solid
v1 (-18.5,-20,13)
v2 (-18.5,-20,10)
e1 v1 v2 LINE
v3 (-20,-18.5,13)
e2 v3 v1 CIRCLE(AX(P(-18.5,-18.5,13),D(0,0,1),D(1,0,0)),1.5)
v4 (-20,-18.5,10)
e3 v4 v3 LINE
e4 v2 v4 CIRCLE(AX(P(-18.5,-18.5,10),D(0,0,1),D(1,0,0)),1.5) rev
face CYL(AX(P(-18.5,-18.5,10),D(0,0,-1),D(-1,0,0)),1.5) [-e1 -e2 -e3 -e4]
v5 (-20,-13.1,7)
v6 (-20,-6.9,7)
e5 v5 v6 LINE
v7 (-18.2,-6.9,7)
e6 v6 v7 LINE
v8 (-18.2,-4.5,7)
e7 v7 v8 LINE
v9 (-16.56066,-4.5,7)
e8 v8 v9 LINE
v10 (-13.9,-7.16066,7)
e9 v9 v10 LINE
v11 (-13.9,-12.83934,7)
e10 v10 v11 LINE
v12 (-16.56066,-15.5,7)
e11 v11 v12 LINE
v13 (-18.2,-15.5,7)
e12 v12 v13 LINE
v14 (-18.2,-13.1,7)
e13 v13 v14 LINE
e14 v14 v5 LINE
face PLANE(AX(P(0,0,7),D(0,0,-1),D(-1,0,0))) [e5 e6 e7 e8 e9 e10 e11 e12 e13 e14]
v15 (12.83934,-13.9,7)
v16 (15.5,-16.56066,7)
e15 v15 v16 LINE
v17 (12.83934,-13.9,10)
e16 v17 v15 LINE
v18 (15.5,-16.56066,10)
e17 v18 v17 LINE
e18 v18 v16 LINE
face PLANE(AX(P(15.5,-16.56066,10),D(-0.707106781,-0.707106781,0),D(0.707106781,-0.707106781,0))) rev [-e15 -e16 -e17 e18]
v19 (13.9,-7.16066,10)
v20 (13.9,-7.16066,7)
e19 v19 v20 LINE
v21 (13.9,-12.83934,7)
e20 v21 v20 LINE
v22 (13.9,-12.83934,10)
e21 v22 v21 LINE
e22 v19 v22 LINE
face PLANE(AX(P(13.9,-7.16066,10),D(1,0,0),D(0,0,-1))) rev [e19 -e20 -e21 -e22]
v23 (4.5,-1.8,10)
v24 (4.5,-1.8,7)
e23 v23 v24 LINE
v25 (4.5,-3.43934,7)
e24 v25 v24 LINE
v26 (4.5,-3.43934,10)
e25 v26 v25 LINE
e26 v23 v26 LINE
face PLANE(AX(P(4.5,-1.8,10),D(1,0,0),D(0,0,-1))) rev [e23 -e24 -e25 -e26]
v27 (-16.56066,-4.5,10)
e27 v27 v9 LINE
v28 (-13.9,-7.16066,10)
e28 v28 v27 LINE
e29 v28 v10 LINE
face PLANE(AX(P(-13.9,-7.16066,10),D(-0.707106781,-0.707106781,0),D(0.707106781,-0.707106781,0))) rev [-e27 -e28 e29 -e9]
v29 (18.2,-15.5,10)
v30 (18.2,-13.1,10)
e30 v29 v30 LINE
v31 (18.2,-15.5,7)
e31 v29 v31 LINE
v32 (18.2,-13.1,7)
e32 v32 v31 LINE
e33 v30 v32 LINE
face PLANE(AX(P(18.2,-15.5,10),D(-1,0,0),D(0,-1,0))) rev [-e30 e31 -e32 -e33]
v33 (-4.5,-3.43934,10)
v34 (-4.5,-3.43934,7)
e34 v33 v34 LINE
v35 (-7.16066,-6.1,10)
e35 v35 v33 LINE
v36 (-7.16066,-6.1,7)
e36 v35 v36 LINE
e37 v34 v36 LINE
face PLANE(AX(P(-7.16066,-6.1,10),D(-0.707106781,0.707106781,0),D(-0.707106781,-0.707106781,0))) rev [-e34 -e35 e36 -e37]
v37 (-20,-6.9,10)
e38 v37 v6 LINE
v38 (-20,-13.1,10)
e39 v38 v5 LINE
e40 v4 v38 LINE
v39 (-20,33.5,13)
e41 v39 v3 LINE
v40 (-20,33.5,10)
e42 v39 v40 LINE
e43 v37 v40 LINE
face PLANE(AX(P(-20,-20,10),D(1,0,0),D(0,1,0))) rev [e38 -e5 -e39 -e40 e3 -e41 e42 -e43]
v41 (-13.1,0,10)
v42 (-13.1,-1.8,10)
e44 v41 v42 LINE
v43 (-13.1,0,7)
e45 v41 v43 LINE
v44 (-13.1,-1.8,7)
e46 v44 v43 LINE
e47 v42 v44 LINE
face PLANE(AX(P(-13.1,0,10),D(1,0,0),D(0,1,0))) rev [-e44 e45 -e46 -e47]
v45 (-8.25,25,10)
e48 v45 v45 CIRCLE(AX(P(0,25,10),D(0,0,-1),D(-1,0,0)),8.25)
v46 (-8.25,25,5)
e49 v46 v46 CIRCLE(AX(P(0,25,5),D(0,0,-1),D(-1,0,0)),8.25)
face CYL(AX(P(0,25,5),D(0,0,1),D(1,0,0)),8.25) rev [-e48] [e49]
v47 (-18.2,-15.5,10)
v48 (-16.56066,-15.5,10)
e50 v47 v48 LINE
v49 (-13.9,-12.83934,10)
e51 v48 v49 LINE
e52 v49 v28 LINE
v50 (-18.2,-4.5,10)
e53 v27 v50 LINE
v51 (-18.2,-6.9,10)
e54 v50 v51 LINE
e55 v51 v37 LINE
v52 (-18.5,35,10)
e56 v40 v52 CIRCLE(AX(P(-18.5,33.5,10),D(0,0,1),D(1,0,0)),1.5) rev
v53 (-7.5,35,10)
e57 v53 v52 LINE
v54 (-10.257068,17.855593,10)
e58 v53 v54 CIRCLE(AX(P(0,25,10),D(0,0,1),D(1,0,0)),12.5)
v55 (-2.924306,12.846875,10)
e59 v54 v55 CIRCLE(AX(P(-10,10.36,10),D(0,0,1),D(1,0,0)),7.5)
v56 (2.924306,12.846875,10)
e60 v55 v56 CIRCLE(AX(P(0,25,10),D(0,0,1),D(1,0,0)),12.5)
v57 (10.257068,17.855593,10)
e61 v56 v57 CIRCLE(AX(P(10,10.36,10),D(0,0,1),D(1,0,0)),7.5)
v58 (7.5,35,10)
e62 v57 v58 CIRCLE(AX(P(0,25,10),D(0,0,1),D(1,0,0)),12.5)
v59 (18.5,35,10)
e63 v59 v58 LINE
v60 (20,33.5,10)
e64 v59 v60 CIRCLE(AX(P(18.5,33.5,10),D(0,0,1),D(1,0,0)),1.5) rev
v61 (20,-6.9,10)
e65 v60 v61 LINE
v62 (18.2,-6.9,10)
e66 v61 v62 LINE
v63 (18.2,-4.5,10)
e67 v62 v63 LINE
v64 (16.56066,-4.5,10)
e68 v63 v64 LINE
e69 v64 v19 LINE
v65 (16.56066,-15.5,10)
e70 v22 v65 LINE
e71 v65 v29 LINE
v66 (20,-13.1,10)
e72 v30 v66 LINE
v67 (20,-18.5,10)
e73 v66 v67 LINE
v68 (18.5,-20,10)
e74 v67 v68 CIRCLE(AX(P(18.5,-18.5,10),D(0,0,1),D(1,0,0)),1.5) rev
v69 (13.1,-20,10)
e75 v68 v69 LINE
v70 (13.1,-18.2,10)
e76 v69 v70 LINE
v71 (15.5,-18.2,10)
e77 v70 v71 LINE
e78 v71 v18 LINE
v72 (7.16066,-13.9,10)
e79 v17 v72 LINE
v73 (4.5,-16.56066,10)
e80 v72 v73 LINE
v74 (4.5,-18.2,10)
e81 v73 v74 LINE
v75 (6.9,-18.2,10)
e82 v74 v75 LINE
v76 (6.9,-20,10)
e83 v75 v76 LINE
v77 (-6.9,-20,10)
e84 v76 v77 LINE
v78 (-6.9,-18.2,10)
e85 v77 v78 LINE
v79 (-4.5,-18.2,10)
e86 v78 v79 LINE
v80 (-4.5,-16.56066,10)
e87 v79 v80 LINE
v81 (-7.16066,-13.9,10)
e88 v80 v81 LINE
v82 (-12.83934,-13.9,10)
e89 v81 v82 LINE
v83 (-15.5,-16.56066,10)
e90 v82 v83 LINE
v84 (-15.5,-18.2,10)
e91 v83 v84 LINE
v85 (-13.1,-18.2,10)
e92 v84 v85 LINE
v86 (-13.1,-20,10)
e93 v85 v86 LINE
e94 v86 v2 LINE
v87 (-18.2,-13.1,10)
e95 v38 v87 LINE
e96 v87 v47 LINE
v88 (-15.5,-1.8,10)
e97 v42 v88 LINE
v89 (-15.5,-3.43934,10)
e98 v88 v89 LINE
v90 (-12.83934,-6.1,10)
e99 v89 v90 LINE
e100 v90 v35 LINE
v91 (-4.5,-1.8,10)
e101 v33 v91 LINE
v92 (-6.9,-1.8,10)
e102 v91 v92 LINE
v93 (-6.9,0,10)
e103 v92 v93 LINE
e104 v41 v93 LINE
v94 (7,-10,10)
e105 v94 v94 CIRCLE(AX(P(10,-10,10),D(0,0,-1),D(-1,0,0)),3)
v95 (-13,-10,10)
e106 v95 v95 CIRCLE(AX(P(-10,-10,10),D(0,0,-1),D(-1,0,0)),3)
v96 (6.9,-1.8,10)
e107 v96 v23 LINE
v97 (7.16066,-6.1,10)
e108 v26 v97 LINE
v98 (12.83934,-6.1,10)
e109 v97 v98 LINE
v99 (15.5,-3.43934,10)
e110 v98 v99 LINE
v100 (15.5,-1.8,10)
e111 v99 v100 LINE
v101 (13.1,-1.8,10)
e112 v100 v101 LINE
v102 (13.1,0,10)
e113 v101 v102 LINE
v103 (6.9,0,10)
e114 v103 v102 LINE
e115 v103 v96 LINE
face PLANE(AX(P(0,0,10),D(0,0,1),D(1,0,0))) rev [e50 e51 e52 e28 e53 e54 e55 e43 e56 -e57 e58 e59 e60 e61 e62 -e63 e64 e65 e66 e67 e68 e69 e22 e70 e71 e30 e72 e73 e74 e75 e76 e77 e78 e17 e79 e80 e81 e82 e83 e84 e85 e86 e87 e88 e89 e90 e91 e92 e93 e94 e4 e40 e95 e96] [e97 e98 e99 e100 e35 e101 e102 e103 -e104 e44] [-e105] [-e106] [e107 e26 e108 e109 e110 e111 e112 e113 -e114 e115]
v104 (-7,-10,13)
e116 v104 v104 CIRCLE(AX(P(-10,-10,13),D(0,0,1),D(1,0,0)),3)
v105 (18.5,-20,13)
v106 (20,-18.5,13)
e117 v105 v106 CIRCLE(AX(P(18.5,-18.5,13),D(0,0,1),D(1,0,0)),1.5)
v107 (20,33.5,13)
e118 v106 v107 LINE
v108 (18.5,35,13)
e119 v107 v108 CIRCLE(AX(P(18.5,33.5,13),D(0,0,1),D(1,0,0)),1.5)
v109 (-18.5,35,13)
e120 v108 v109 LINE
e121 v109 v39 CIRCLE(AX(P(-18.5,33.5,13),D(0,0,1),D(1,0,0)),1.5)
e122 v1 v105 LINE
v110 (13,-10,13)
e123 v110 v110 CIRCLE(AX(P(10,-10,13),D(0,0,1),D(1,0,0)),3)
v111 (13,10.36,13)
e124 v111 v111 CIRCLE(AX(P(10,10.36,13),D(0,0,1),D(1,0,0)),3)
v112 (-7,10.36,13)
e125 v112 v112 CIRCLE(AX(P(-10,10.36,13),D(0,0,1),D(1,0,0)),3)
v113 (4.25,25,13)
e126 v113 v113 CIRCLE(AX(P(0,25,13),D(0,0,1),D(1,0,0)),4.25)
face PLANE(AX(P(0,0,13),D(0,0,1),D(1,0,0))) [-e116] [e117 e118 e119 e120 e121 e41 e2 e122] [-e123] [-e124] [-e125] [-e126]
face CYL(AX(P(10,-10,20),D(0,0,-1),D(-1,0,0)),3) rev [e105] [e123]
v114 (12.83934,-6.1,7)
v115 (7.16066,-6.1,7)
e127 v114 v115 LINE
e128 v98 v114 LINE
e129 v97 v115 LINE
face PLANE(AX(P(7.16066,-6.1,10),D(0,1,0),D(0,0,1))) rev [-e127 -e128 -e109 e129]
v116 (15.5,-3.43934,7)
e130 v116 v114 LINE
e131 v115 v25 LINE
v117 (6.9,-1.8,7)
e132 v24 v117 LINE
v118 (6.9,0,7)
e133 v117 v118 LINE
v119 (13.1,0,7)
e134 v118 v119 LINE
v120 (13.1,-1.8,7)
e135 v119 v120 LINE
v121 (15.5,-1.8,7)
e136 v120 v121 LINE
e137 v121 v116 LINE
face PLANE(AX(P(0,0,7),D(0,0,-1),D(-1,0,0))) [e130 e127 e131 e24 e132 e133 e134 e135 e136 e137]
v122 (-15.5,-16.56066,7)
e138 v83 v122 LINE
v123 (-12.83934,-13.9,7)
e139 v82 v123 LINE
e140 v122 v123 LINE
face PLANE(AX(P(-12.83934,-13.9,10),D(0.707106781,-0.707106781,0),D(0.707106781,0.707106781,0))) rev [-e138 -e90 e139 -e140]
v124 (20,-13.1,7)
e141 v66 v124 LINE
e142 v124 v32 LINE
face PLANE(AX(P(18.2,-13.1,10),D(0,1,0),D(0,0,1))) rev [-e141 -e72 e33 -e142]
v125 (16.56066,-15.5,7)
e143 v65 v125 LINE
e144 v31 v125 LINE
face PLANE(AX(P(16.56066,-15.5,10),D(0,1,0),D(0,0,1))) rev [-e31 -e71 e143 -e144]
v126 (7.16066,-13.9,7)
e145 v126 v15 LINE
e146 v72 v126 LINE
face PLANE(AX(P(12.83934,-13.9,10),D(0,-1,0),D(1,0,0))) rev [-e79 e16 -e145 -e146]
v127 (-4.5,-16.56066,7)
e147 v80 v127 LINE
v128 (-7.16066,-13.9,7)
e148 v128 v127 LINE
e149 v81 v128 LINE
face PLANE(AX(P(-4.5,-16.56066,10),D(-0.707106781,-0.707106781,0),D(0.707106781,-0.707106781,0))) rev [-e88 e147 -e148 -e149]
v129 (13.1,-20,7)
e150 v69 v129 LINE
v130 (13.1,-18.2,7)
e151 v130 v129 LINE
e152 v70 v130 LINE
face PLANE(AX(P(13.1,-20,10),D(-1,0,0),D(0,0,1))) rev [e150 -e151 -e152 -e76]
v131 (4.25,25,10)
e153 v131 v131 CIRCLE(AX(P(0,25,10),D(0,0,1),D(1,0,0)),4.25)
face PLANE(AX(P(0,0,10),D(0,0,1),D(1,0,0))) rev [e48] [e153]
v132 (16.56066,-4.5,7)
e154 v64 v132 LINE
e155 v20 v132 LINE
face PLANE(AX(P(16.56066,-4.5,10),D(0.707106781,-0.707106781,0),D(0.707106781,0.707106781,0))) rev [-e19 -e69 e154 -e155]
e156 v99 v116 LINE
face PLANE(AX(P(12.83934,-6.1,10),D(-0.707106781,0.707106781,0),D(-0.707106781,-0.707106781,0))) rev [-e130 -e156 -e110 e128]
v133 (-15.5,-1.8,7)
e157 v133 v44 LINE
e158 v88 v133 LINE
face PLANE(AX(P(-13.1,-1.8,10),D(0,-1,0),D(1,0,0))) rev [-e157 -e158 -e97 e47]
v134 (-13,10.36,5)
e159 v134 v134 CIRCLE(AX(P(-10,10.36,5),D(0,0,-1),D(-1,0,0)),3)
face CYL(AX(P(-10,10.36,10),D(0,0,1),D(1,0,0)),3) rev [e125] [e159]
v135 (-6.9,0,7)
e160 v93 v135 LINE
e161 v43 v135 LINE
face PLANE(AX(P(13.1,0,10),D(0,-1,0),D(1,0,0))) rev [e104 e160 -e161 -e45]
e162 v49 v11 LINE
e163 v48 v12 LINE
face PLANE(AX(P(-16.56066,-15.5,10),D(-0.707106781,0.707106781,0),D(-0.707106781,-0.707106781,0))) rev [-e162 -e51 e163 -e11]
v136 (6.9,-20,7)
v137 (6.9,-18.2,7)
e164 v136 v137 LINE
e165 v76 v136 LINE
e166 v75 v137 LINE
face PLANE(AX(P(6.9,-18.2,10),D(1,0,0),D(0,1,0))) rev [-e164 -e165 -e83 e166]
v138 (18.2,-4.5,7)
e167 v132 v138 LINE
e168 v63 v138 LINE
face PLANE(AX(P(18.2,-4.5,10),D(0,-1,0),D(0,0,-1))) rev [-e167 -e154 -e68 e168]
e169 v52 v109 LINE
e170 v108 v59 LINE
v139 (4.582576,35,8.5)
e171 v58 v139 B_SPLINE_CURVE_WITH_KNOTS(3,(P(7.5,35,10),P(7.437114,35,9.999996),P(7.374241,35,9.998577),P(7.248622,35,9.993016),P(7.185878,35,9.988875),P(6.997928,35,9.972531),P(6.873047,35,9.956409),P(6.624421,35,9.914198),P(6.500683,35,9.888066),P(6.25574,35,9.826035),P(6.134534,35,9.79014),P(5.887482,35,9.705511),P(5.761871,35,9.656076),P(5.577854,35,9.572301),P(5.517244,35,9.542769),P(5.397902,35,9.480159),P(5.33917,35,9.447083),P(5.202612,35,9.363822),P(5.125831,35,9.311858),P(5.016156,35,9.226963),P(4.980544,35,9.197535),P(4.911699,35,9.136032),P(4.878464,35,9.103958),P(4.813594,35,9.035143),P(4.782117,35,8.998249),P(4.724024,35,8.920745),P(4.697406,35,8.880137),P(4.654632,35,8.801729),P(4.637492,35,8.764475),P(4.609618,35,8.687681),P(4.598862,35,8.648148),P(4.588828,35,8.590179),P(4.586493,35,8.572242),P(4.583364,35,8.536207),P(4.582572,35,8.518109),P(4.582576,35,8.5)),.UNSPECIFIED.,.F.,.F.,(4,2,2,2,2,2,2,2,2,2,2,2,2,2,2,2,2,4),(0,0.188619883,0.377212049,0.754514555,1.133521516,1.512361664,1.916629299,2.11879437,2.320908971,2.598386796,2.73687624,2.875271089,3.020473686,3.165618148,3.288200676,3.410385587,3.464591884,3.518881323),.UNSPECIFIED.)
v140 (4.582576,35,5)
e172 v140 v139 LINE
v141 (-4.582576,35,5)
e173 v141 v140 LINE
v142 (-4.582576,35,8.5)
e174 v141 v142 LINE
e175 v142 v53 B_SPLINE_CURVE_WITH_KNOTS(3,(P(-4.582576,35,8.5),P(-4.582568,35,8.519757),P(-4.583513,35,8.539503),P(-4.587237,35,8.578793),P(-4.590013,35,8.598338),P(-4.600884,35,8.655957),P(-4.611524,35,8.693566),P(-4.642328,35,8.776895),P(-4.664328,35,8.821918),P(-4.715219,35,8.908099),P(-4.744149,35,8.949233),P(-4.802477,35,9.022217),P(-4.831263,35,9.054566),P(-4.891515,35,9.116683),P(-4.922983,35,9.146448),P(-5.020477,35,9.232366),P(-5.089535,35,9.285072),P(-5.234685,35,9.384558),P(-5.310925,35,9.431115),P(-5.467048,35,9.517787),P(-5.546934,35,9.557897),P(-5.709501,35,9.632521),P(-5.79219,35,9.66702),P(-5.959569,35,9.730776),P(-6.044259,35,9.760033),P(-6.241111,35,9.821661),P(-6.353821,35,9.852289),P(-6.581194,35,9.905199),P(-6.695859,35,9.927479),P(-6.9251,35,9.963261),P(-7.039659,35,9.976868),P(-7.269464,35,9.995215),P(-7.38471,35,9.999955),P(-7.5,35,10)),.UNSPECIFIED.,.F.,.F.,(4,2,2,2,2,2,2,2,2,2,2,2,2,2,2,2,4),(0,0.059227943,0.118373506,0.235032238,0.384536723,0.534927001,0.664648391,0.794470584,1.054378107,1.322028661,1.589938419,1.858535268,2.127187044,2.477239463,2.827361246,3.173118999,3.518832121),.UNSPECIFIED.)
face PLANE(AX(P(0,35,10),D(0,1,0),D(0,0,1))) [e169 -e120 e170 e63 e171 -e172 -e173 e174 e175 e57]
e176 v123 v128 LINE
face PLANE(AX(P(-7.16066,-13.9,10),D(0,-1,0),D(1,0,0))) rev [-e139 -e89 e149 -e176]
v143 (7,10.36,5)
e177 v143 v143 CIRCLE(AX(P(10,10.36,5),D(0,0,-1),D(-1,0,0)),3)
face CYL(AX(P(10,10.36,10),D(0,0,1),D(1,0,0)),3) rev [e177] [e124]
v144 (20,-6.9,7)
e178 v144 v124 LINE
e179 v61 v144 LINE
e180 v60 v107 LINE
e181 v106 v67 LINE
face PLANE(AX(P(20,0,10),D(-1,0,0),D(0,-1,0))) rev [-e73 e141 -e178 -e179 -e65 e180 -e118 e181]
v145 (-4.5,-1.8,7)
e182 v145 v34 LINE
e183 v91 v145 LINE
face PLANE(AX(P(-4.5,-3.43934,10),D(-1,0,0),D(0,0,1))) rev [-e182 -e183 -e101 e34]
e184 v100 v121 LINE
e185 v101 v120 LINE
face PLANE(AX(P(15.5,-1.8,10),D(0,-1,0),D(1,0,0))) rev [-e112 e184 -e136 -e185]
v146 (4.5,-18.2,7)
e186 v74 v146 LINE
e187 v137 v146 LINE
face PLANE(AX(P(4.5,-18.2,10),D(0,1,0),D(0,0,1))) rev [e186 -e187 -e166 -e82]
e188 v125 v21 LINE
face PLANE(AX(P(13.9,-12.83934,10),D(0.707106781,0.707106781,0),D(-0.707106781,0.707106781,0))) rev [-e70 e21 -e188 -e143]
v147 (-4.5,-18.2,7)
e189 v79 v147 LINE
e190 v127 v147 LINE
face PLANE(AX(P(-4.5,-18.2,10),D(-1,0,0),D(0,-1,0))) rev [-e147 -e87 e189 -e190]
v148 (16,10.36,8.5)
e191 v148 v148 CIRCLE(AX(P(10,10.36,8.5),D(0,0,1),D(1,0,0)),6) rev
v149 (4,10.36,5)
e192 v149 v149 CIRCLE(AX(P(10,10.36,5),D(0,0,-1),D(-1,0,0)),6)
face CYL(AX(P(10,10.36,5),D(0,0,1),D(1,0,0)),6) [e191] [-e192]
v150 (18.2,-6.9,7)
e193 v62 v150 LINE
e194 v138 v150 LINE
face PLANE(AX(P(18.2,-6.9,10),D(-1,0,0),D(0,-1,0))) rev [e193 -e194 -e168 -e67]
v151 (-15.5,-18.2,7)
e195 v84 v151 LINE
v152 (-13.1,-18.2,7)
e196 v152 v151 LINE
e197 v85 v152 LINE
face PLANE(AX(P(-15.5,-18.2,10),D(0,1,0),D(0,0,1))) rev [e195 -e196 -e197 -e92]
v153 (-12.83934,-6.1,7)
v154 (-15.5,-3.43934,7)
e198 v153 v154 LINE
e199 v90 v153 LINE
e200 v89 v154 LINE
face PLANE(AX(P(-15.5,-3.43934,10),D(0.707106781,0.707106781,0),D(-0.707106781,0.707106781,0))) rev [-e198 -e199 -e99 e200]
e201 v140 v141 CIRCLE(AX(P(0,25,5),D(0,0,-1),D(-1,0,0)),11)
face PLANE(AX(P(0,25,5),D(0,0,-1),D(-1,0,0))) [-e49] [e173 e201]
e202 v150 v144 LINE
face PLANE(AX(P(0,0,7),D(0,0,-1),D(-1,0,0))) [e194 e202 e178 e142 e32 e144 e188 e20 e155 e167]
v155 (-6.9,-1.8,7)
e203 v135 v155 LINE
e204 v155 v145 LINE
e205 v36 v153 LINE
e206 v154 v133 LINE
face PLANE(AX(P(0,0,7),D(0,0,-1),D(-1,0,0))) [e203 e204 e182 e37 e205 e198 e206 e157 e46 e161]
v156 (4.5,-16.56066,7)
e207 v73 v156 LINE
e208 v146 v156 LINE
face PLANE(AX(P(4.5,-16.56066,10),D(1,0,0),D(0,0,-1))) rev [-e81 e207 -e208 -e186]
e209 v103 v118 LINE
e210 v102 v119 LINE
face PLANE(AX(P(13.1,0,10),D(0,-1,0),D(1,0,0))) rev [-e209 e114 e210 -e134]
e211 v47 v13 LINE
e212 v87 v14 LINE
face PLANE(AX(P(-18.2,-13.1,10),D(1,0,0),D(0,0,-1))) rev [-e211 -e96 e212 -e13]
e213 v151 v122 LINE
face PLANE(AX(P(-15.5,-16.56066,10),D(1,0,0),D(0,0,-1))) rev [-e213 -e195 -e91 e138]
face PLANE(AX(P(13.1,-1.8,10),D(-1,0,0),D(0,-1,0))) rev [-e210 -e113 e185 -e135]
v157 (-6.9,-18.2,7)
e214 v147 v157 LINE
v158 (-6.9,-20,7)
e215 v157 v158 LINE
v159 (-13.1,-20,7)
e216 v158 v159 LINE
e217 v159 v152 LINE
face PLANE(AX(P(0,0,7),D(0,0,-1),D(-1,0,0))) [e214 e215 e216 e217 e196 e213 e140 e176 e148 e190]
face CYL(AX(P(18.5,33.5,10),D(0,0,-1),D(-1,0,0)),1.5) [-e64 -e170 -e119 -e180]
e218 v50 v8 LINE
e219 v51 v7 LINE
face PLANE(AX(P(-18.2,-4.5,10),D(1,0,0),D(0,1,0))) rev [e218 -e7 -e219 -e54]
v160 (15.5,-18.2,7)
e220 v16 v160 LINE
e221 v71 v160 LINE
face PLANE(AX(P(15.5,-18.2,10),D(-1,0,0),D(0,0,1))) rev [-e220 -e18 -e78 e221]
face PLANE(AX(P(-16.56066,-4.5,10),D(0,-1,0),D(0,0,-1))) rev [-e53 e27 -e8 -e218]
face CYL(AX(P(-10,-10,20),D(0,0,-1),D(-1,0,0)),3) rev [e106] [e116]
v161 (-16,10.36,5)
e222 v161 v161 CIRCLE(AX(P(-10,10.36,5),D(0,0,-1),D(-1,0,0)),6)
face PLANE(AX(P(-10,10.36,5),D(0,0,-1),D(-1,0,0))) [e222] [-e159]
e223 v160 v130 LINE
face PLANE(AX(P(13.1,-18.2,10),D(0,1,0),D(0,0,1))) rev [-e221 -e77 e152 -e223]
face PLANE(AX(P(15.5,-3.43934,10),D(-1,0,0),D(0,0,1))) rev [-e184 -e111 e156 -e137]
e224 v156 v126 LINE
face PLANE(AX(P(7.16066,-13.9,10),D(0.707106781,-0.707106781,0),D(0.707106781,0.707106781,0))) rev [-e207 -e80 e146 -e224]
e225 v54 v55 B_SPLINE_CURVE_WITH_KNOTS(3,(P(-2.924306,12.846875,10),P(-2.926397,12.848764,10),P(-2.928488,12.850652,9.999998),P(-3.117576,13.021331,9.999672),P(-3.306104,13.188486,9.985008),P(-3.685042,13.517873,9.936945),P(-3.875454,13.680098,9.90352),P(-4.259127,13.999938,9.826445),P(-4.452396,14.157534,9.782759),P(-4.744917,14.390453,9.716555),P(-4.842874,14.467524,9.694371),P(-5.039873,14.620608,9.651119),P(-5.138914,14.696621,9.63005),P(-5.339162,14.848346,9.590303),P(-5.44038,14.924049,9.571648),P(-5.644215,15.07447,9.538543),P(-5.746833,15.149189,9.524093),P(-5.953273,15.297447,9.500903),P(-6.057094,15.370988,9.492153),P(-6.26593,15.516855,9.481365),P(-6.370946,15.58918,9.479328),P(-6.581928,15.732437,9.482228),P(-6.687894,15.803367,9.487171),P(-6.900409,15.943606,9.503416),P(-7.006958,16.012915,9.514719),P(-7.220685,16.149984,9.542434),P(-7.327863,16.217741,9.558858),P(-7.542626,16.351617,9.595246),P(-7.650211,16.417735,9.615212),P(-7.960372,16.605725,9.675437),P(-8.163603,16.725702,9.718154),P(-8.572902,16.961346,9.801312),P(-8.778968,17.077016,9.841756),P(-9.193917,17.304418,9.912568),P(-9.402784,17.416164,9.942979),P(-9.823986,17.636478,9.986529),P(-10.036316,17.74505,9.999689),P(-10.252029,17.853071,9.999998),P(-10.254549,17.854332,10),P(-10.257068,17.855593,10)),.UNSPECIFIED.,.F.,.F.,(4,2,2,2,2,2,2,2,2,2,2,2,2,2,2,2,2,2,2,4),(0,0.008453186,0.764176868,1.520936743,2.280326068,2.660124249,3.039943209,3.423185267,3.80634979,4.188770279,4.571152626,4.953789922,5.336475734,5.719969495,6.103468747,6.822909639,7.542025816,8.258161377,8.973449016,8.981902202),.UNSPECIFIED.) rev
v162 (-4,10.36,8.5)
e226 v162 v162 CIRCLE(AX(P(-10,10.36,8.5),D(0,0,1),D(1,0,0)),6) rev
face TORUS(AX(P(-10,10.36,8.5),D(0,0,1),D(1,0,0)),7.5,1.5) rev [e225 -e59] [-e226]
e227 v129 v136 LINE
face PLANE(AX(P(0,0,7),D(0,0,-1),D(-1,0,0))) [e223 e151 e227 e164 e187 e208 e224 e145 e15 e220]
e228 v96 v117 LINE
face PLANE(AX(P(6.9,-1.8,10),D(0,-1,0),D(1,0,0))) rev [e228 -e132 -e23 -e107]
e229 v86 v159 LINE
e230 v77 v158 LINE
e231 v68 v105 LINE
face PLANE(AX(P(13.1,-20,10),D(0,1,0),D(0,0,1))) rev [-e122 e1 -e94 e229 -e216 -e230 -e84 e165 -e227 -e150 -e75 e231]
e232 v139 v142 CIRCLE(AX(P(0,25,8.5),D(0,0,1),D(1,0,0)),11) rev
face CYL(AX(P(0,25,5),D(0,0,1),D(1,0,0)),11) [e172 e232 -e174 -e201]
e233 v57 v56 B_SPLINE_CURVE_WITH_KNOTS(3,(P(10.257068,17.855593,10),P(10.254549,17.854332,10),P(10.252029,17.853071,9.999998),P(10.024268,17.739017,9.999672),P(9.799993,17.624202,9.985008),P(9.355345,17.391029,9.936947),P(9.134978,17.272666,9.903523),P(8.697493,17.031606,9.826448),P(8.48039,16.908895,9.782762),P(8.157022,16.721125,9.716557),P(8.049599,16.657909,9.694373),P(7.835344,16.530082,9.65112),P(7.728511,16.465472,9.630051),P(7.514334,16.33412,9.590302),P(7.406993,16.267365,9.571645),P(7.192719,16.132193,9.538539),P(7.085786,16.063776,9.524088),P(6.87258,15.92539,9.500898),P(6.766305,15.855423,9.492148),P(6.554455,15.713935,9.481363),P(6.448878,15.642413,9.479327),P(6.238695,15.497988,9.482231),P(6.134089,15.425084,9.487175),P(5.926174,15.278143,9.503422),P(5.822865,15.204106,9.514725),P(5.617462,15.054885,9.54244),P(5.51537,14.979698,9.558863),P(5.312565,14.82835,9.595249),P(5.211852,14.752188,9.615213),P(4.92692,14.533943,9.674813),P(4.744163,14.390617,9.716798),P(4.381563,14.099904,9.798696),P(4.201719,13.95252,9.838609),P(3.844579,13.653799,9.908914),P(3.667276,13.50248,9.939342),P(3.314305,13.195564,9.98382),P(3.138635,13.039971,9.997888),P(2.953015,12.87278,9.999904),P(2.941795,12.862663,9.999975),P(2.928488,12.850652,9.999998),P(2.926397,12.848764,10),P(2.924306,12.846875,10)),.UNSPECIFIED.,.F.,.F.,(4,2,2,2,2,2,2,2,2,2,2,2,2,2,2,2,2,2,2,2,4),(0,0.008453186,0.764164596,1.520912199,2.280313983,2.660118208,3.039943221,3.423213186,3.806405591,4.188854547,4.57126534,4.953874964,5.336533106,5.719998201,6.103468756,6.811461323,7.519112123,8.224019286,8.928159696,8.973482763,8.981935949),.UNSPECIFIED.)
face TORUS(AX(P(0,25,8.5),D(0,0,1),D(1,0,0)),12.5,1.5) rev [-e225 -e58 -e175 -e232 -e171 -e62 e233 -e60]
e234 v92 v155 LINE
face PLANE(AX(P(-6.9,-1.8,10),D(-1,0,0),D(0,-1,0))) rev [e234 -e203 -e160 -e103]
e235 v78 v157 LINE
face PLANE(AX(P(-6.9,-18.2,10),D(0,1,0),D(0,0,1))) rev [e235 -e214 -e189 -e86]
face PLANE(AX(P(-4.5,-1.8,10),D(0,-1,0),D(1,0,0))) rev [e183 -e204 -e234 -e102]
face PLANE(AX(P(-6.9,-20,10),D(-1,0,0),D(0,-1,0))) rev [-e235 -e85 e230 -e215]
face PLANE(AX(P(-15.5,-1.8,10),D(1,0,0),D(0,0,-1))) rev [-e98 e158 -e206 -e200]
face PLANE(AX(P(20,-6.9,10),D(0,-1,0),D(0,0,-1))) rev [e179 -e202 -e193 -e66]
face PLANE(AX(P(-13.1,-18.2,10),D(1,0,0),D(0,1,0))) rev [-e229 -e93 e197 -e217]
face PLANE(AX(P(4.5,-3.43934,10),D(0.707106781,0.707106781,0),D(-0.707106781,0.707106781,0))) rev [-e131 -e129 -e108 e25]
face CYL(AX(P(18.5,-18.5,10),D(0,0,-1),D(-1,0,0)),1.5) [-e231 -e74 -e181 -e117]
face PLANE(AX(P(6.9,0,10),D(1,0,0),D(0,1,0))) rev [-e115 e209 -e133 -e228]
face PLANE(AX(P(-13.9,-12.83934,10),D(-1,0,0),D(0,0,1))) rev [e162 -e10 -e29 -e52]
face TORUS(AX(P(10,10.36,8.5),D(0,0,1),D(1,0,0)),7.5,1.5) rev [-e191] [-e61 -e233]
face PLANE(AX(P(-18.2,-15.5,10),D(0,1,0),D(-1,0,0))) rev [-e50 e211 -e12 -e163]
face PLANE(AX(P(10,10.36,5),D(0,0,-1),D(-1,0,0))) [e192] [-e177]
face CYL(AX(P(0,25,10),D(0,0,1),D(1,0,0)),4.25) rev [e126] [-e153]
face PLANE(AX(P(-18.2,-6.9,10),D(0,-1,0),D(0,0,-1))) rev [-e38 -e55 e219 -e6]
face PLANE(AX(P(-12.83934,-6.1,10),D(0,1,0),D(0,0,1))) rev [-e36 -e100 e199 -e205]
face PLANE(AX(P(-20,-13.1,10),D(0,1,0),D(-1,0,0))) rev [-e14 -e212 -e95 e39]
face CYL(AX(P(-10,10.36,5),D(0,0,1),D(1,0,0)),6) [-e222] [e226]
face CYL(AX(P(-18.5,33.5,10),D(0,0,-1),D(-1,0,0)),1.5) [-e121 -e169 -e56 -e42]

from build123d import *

# Parameters (mm, degrees)
SKETCH_1_R          = 2.55
EXTRUDE_1_DEPTH     = 10
SKETCH_2_W          = 40
SKETCH_2_H          = 20
EXTRUDE_2_DEPTH     = 3
EXTRUDE_3_DEPTH     = 3
CUT_EXTRUDE_1_DEPTH = 10
SKETCH_5_R          = 3
CUT_EXTRUDE_2_DEPTH = 10
SKETCH_6_R          = 3
SKETCH_6_R_2        = 4.25
EXTRUDE_4_DEPTH     = 3
FILLET_1_R          = 1.5
SKETCH_7_R          = 6
SKETCH_7_R_2        = 3
EXTRUDE_5_DEPTH     = 5
SKETCH_8_R          = 8.25
EXTRUDE_6_DEPTH     = 5
FILLET_3_R          = 1.5


with BuildPart() as part:
    # 草图1 → 凸台-拉伸1 (new body)
    with BuildSketch(Plane.XY):
        Polygon((-20, 0), (-20, -6.9), (-18.2, -6.9), (-18.2, -4.5), (-16.560660172, -4.5), (-13.9, -7.160660172), (-13.9, -12.839339828), (-16.560660172, -15.5), (-18.2, -15.5), (-18.2, -13.1), (-20, -13.1), (-20, -20), (-13.1, -20), (-13.1, -18.2), (-15.5, -18.2), (-15.5, -16.560660172), (-12.839339828, -13.9), (-7.160660172, -13.9), (-4.5, -16.560660172), (-4.5, -18.2), (-6.9, -18.2), (-6.9, -20), (0, -20), (6.9, -20), (6.9, -18.2), (4.5, -18.2), (4.5, -16.560660172), (7.160660172, -13.9), (12.839339828, -13.9), (15.5, -16.560660172), (15.5, -18.2), (13.1, -18.2), (13.1, -20), (20, -20), (20, -13.1), (18.2, -13.1), (18.2, -15.5), (16.560660172, -15.5), (13.9, -12.839339828), (13.9, -7.160660172), (16.560660172, -4.5), (18.2, -4.5), (18.2, -6.9), (20, -6.9), (20, 0), (13.1, 0), (13.1, -1.8), (15.5, -1.8), (15.5, -3.439339828), (12.839339828, -6.1), (7.160660172, -6.1), (4.5, -3.439339828), (4.5, -1.8), (6.9, -1.8), (6.9, 0), (0, 0), (-6.9, 0), (-6.9, -1.8), (-4.5, -1.8), (-4.5, -3.439339828), (-7.160660172, -6.1), (-12.839339828, -6.1), (-15.5, -3.439339828), (-15.5, -1.8), (-13.1, -1.8), (-13.1, 0), align=None)
        with Locations((-10, -10)):
            Circle(SKETCH_1_R, mode=Mode.SUBTRACT)
        with Locations((10, -10)):
            Circle(SKETCH_1_R, mode=Mode.SUBTRACT)
        Polygon((-3.439339828, -4.5), (-6.1, -7.160660172), (-6.1, -12.839339828), (-3.439339828, -15.5), (-3.439339828, -18.2), (3.439339828, -18.2), (3.439339828, -15.5), (6.1, -12.839339828), (6.1, -7.160660172), (3.439339828, -4.5), (3.439339828, -1.8), (-3.439339828, -1.8), align=None, mode=Mode.SUBTRACT)
    extrude(amount=EXTRUDE_1_DEPTH)

    # 草图2 → 凸台-拉伸2 (add)
    with BuildSketch(Plane.XY.offset(10)):
        with Locations((0, -10)):
            Rectangle(SKETCH_2_W, SKETCH_2_H)
    extrude(amount=EXTRUDE_2_DEPTH)

    # 草图3 → 凸台-拉伸3 (add)
    with BuildSketch(Plane(origin=(0, 0, 10), x_dir=(-1, 0, 0), z_dir=(0, 0, -1))):
        Polygon((-13.1, -20), (-6.9, -20), (-6.9, -18.2), (-4.5, -18.2), (-4.5, -16.560660172), (-7.160660172, -13.9), (-12.839339828, -13.9), (-15.5, -16.560660172), (-15.5, -18.2), (-13.1, -18.2), align=None)
        Polygon((-20, -6.9), (-20, -13.1), (-18.2, -13.1), (-18.2, -15.5), (-16.560660172, -15.5), (-13.9, -12.839339828), (-13.9, -7.160660172), (-16.560660172, -4.5), (-18.2, -4.5), (-18.2, -6.9), align=None)
        Polygon((-6.9, 0), (-13.1, 0), (-13.1, -1.8), (-15.5, -1.8), (-15.5, -3.439339828), (-12.839339828, -6.1), (-7.160660172, -6.1), (-4.5, -3.439339828), (-4.5, -1.8), (-6.9, -1.8), align=None)
        Polygon((6.9, -20), (13.1, -20), (13.1, -18.2), (15.5, -18.2), (15.5, -16.560660172), (12.839339828, -13.9), (7.160660172, -13.9), (4.5, -16.560660172), (4.5, -18.2), (6.9, -18.2), align=None)
        Polygon((20, -13.1), (20, -6.9), (18.2, -6.9), (18.2, -4.5), (16.560660172, -4.5), (13.9, -7.160660172), (13.9, -12.839339828), (16.560660172, -15.5), (18.2, -15.5), (18.2, -13.1), align=None)
        Polygon((13.1, 0), (6.9, 0), (6.9, -1.8), (4.5, -1.8), (4.5, -3.439339828), (7.160660172, -6.1), (12.839339828, -6.1), (15.5, -3.439339828), (15.5, -1.8), (13.1, -1.8), align=None)
    extrude(amount=EXTRUDE_3_DEPTH)

    # 草图4 → 切除-拉伸1 (cut)
    with BuildSketch(Plane(origin=(0, 0, 0), x_dir=(-1, 0, 0), z_dir=(0, 0, -1))):
        Polygon((6.9, 0), (-6.9, 0), (-6.9, -1.8), (-4.5, -1.8), (-4.5, -3.439339828), (-7.160660172, -6.1), (-12.839339828, -6.1), (-15.5, -3.439339828), (-15.5, -1.8), (-13.1, -1.8), (-13.1, 0), (-20, 0), (-20, -6.9), (-18.2, -6.9), (-18.2, -4.5), (-16.560660172, -4.5), (-13.9, -7.160660172), (-13.9, -12.839339828), (-16.560660172, -15.5), (-18.2, -15.5), (-18.2, -13.1), (-20, -13.1), (-20, -20), (-13.1, -20), (-13.1, -18.2), (-15.5, -18.2), (-15.5, -16.560660172), (-12.839339828, -13.9), (-7.160660172, -13.9), (-4.5, -16.560660172), (-4.5, -18.2), (-6.9, -18.2), (-6.9, -20), (6.9, -20), (6.9, -18.2), (4.5, -18.2), (4.5, -16.560660172), (7.160660172, -13.9), (12.839339828, -13.9), (15.5, -16.560660172), (15.5, -18.2), (13.1, -18.2), (13.1, -20), (20, -20), (20, -13.1), (18.2, -13.1), (18.2, -15.5), (16.560660172, -15.5), (13.9, -12.839339828), (13.9, -7.160660172), (16.560660172, -4.5), (18.2, -4.5), (18.2, -6.9), (20, -6.9), (20, 0), (13.1, 0), (13.1, -1.8), (15.5, -1.8), (15.5, -3.439339828), (12.839339828, -6.1), (7.160660172, -6.1), (4.5, -3.439339828), (4.5, -1.8), (6.9, -1.8), align=None)
    extrude(amount=-CUT_EXTRUDE_1_DEPTH, mode=Mode.SUBTRACT)

    # 草图5 → 切除-拉伸2 (cut)
    with BuildSketch(Plane(origin=(0, 0, 10), x_dir=(-1, 0, 0), z_dir=(0, 0, -1))):
        with Locations((-10, -10)):
            Circle(SKETCH_5_R)
        with Locations((10, -10)):
            Circle(SKETCH_5_R)
    extrude(amount=-CUT_EXTRUDE_2_DEPTH, mode=Mode.SUBTRACT)

    # 草图6 → 凸台-拉伸4 (add)
    with BuildSketch(Plane.XY.offset(13)):
        Polygon((-20, 0), (20, 0), (20, 35), (0, 35), (-20, 35), align=None)
        with Locations((-10, 10.36)):
            Circle(SKETCH_6_R, mode=Mode.SUBTRACT)
        with Locations((10, 10.36)):
            Circle(SKETCH_6_R, mode=Mode.SUBTRACT)
        with Locations((0, 25)):
            Circle(SKETCH_6_R_2, mode=Mode.SUBTRACT)
    extrude(amount=-EXTRUDE_4_DEPTH)

    # 圆角1
    fillet_1_edges = [part.edges().sort_by_distance(p)[0] for p in [
        (20, -20, 11.5),
        (-20, -20, 11.5),
        (-20, 35, 11.5),
        (20, 35, 11.5),
    ]]
    fillet(fillet_1_edges, radius=FILLET_1_R)

    # 草图7 → 凸台-拉伸5 (add)
    # profile 1 of 2: a face of its own
    with BuildSketch(Plane(origin=(0, 0, 10), x_dir=(-1, 0, 0), z_dir=(0, 0, -1))):
        with Locations(Location((-10, 10.36, 0), (0, 0, 180))):
            Circle(SKETCH_7_R)
        with Locations(Location((-10, 10.36, 0), (0, 0, 180))):
            Circle(SKETCH_7_R_2, mode=Mode.SUBTRACT)
    # profile 2 of 2: a face of its own
    with BuildSketch(Plane(origin=(0, 0, 10), x_dir=(-1, 0, 0), z_dir=(0, 0, -1))):
        with Locations(Location((10, 10.36, 0), (0, 0, 180))):
            Circle(SKETCH_7_R)
        with Locations(Location((10, 10.36, 0), (0, 0, 180))):
            Circle(SKETCH_7_R_2, mode=Mode.SUBTRACT)
    extrude(amount=EXTRUDE_5_DEPTH)

    # 草图8 → 凸台-拉伸6 (add)
    with BuildSketch(Plane(origin=(0, 0, 10), x_dir=(-1, 0, 0), z_dir=(0, 0, -1))):
        with BuildLine():
            Line((-4.582575695, 35), (4.582575695, 35))
            ThreePointArc((4.582575695, 35), (0, 14), (-4.582575695, 35))
        make_face()
        with Locations((0, 25)):
            Circle(SKETCH_8_R, mode=Mode.SUBTRACT)
    extrude(amount=EXTRUDE_6_DEPTH)

    # 圆角3
    # the kernel refuses this fillet: 1.5 mm, written as the material it adds along each edge
    with BuildSketch(Plane(origin=(10, 10.36, 10), x_dir=(1, 0, 0), z_dir=(0, 1, 0))) as fillet_3_piece_1:
        with BuildLine():
            CenterArc((6 + FILLET_3_R, FILLET_3_R), FILLET_3_R, 180, 90)
            Line((6, FILLET_3_R), (6 - FILLET_3_R * 0.02, FILLET_3_R))
            Line((6 - FILLET_3_R * 0.02, FILLET_3_R), (6 - FILLET_3_R * 0.02, -FILLET_3_R * 0.02))
            Line((6 - FILLET_3_R * 0.02, -FILLET_3_R * 0.02), (6 + FILLET_3_R, -FILLET_3_R * 0.02))
            Line((6 + FILLET_3_R, -FILLET_3_R * 0.02), (6 + FILLET_3_R, 0))
        make_face()
    revolve(axis=Axis((10, 10.36, 10), (0, 0, -1)))
    with BuildSketch(Plane(origin=(-10, 10.36, 10), x_dir=(1, 0, 0), z_dir=(0, 1, 0))) as fillet_3_piece_2:
        with BuildLine():
            CenterArc((6 + FILLET_3_R, FILLET_3_R), FILLET_3_R, 180, 90)
            Line((6, FILLET_3_R), (6 - FILLET_3_R * 0.02, FILLET_3_R))
            Line((6 - FILLET_3_R * 0.02, FILLET_3_R), (6 - FILLET_3_R * 0.02, -FILLET_3_R * 0.02))
            Line((6 - FILLET_3_R * 0.02, -FILLET_3_R * 0.02), (6 + FILLET_3_R, -FILLET_3_R * 0.02))
            Line((6 + FILLET_3_R, -FILLET_3_R * 0.02), (6 + FILLET_3_R, 0))
        make_face()
    revolve(axis=Axis((-10, 10.36, 10), (0, 0, -1)))
    with BuildSketch(Plane(origin=(0, 25, 10), x_dir=(-0.08704252820230896, 0.9962045965985854, 0), z_dir=(0.9962045965985854, 0.08704252820230896, 0))) as fillet_3_piece_3_section:
        with BuildLine():
            CenterArc((11 + FILLET_3_R, -FILLET_3_R), FILLET_3_R, 90, 90)
            Line((11, -FILLET_3_R), (11 - FILLET_3_R * 0.02, -FILLET_3_R))
            Line((11 - FILLET_3_R * 0.02, -FILLET_3_R), (11 - FILLET_3_R * 0.02, FILLET_3_R * 0.02))
            Line((11 - FILLET_3_R * 0.02, FILLET_3_R * 0.02), (11 + FILLET_3_R, FILLET_3_R * 0.02))
            Line((11 + FILLET_3_R, FILLET_3_R * 0.02), (11 + FILLET_3_R, 0))
        make_face()
    fillet_3_piece_3 = revolve(axis=Axis((0, 25, 10), (0, 0, 1)), revolution_arc=350.013022923, mode=Mode.PRIVATE)
    fillet_3_piece_3 = split(fillet_3_piece_3, bisect_by=Plane(origin=(0, 35, 9.583684296), z_dir=(0, -1, 0)), keep=Keep.TOP, mode=Mode.PRIVATE)
    add(fillet_3_piece_3)


solid = part.part
